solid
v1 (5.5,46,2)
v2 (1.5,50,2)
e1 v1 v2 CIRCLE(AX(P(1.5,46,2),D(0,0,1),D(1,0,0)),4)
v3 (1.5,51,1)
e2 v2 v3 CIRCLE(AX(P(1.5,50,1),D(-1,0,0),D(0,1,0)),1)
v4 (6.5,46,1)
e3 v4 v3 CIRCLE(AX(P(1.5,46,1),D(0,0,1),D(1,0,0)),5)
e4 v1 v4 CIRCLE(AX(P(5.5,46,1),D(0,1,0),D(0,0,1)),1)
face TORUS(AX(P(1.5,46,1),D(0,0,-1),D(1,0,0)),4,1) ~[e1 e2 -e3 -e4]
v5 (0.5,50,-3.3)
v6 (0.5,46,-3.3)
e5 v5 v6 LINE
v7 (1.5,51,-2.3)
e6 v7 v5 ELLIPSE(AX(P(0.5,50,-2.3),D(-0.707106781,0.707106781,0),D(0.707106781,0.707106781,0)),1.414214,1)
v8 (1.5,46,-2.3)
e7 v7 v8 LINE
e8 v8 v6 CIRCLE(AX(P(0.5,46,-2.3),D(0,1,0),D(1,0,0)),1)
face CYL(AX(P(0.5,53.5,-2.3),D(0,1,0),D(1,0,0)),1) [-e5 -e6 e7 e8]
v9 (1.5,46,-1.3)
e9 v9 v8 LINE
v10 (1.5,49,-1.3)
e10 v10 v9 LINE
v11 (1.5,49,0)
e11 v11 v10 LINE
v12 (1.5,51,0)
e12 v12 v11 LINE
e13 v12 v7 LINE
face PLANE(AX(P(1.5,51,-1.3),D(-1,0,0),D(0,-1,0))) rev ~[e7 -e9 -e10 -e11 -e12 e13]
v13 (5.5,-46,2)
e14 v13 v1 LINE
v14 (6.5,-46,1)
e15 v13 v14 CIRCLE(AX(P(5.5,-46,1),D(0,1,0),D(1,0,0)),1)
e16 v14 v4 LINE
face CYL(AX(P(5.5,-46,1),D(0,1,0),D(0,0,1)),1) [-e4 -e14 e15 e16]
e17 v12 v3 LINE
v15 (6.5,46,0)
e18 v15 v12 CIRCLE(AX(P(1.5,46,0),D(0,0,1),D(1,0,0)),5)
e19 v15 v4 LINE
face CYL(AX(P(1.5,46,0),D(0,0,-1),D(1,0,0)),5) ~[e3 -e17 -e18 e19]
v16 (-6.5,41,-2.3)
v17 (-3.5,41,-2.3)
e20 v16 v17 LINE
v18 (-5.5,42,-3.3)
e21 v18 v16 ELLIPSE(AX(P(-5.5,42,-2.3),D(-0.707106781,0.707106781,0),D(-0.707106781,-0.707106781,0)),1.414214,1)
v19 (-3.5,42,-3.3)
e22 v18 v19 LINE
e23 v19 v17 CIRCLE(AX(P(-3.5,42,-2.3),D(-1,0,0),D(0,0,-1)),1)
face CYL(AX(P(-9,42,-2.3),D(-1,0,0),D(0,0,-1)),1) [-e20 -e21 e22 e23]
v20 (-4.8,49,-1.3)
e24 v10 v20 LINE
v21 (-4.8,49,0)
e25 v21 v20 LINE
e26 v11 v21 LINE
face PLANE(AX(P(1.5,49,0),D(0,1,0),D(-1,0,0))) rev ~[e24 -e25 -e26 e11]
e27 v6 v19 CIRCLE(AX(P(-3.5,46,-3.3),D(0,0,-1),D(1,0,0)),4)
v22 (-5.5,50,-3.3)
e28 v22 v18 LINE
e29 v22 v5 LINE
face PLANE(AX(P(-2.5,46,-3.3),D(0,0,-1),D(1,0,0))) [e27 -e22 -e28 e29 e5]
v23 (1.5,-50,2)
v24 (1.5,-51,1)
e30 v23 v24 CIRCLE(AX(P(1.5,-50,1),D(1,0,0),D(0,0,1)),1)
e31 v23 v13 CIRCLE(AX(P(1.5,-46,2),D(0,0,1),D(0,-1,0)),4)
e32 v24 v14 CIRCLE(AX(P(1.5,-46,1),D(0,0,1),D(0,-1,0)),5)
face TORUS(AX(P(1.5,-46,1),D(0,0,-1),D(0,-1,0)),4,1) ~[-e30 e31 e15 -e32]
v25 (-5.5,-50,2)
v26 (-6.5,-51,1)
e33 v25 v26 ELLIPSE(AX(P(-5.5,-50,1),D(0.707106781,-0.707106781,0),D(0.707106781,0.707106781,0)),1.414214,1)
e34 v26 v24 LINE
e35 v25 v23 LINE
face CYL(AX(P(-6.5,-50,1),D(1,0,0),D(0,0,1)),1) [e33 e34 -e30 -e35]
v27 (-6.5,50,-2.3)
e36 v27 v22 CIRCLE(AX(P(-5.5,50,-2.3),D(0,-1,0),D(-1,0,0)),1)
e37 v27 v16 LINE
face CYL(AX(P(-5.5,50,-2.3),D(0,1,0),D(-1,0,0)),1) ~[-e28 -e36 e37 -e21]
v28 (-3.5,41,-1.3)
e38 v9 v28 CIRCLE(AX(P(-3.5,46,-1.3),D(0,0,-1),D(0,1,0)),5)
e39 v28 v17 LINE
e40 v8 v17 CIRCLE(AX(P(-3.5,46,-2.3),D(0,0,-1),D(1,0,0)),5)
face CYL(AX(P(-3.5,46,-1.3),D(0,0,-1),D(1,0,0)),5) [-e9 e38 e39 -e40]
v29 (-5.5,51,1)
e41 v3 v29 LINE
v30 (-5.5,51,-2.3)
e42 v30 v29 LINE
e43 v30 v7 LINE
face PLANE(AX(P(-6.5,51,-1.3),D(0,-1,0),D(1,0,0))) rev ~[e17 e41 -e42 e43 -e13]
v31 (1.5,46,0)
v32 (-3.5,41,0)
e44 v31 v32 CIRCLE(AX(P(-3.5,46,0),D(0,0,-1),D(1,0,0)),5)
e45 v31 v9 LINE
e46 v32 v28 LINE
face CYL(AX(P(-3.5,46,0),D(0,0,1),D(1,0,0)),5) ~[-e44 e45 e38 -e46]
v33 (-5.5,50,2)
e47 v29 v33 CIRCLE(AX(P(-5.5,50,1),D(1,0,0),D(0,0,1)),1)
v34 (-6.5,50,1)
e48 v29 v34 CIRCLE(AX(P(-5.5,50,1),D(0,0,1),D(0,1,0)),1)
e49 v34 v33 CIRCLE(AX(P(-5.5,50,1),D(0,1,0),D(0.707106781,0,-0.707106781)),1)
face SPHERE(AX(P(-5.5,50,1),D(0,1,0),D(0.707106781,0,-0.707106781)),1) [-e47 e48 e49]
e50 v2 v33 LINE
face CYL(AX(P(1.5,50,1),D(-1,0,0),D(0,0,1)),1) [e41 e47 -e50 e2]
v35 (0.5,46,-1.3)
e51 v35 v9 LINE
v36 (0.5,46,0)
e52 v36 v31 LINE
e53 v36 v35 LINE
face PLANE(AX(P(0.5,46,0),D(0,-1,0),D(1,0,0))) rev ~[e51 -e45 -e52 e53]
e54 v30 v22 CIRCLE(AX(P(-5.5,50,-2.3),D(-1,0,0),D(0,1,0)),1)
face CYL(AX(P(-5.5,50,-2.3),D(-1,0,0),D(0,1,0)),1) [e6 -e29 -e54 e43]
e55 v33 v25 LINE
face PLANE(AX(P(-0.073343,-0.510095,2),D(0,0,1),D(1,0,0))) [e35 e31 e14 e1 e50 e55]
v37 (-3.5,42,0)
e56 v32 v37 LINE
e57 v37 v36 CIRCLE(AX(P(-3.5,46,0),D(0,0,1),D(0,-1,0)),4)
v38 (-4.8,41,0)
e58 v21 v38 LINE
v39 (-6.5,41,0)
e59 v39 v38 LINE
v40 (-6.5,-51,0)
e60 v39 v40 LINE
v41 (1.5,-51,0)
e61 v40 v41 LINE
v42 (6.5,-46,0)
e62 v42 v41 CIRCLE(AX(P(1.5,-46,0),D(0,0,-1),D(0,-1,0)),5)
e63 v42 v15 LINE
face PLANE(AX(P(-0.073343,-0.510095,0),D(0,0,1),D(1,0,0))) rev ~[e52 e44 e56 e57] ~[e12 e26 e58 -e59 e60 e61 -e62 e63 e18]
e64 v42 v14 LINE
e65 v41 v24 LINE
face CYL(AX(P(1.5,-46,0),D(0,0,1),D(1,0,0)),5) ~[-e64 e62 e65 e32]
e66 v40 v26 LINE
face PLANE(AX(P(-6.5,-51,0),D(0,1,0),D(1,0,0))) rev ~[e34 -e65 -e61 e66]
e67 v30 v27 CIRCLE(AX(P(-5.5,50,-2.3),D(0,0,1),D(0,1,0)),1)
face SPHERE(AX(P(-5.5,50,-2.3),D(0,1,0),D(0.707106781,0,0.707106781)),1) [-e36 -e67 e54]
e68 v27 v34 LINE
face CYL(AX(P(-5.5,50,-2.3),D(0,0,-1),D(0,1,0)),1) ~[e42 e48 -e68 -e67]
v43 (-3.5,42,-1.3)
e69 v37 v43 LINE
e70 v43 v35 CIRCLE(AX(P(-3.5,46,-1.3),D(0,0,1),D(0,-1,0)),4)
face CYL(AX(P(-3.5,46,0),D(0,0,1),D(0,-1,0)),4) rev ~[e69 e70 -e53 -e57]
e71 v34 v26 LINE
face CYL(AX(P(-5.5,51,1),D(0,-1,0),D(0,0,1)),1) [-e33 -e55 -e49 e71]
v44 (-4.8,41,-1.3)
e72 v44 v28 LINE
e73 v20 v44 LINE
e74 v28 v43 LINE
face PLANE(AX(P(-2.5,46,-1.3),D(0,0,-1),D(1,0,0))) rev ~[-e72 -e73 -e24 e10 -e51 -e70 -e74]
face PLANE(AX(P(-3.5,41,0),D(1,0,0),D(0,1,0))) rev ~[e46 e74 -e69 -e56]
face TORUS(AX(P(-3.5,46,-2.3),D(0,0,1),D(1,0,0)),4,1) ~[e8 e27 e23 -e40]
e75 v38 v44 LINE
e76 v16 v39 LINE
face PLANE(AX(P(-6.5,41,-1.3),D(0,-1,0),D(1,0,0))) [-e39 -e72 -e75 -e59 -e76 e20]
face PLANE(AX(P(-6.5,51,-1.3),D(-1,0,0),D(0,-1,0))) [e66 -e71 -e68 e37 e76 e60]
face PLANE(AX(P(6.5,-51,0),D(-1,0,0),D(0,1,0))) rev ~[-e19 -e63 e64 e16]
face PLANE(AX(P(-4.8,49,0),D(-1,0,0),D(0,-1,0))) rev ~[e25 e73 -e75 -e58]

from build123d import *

# Parameters (mm, degrees)
F1_DEPTH     = 2
F2_W         = 1.7
F2_H         = 2
F2_W_2       = 6.3
F2_H_2       = 8
F3_DEPTH     = 1.3
F4_W         = 8
F4_H         = 10
F5_DEPTH     = 2
F6_R         = 5
F7_R         = 1
F8_T1_DEPTH  = 3.3
F8_T3_DEPTH  = 7.5
F8_T5_DEPTH  = 9.5
F8_T7_DEPTH  = 5.5
F8_T9_DEPTH  = 11.5
F8_S13_W     = 1
F8_S13_H     = 1
F8_T14_DEPTH = 1
F8_S19_W     = 1
F8_S19_H     = 1
F8_T20_DEPTH = 1
F8_T24_ANGLE = 90
F10_DEPTH    = 1.3


# Not quite as in the source:
# - a fillet or chamfer that OpenCascade refuses, or shapes differently, is made with other operations: its cross-section is extruded or revolved along the edge and cut away or added


with BuildPart() as f1:
    # F0 (on Top) → F1 (new body)
    with BuildSketch(Plane.XY):
        with BuildLine():
            Line((-6.5, -51), (6.5, -51))
            Line((6.5, -51), (6.5, 46))
            ThreePointArc((6.5, 46), (5.0355339059, 49.5355339059), (1.5, 51))
            Line((1.5, 51), (-6.5, 51))
            Line((-6.5, 51), (-6.5, -51))
        make_face()
    extrude(amount=F1_DEPTH)

    # F2 (on face) → F3 (join)
    with BuildSketch(Plane(origin=(0, 0, 0), x_dir=(1, 0, 0), z_dir=(0, 0, -1))):
        with Locations((-5.65, -50)):
            Rectangle(F2_W, F2_H)
        with Locations((-1.65, -50)):
            Rectangle(F2_W_2, F2_H)
        with Locations((-5.65, -45)):
            Rectangle(F2_W, F2_H_2)
    extrude(amount=F3_DEPTH)

    # F4 (on face) → F5 (join)
    with BuildSketch(Plane(origin=(0, 0, -1.3), x_dir=(1, 0, 0), z_dir=(0, 0, -1))):
        with Locations((-2.5, -46)):
            Rectangle(F4_W, F4_H)
    extrude(amount=F5_DEPTH)

    # F6
    f6_edges = [f1.edges().sort_by_distance(p)[0] for p in [
        (6.5, -51, 1),
        (1.5, 41, -2.3),
    ]]
    fillet(f6_edges, radius=F6_R)

    # F7
    f7_edges = [f1.edges().sort_by_distance(p)[0] for p in [
        (-2.5, -51, 2),
        (5.035534, -49.535534, 2),
        (-6.5, 0, 2),
        (6.5, 0, 2),
        (-2.5, 51, 2),
        (5.035534, 49.535534, 2),
    ]]
    fillet(f7_edges, radius=F7_R)

    # F8: fillet of radius 1 on 6 edges, made by hand

    # F8_s2 → F8_t1 (cut)
    with BuildSketch(Plane.XY.offset(-2.3)):
        with BuildLine():
            ThreePointArc((-5.5, 51), (-6.2071067812, 50.7071067812), (-6.5, 50))
            Line((-6.5, 50), (-6.5, 51))
            Line((-6.5, 51), (-5.5, 51))
        make_face()
    extrude(amount=F8_T1_DEPTH, mode=Mode.SUBTRACT)

    # F8_s4 → F8_t3 (cut)
    with BuildSketch(Plane.XZ.offset(-53.5)):
        with BuildLine():
            ThreePointArc((1.5, -2.3), (1.2071067812, -3.0071067812), (0.5, -3.3))
            Line((0.5, -3.3), (1.5, -3.3))
            Line((1.5, -3.3), (1.5, -2.3))
        make_face()
    extrude(amount=F8_T3_DEPTH, mode=Mode.SUBTRACT)

    # F8_s6 → F8_t5 (cut)
    with BuildSketch(Plane.YZ.offset(-5.5)):
        with BuildLine():
            ThreePointArc((51, -2.3), (50.7071067812, -3.0071067812), (50, -3.3))
            Line((50, -3.3), (51, -3.3))
            Line((51, -3.3), (51, -2.3))
        make_face()
    extrude(amount=F8_T5_DEPTH, mode=Mode.SUBTRACT)

    # F8_s8 → F8_t7 (cut)
    with BuildSketch(Plane.YZ.offset(-9)):
        with BuildLine():
            ThreePointArc((42, -3.3), (41.2928932188, -3.0071067812), (41, -2.3))
            Line((41, -2.3), (41, -3.3))
            Line((41, -3.3), (42, -3.3))
        make_face()
    extrude(amount=F8_T7_DEPTH, mode=Mode.SUBTRACT)

    # F8_s10 → F8_t9 (cut)
    with BuildSketch(Plane.XZ.offset(-50)):
        with BuildLine():
            ThreePointArc((-6.5, -2.3), (-6.2071067812, -3.0071067812), (-5.5, -3.3))
            Line((-5.5, -3.3), (-6.5, -3.3))
            Line((-6.5, -3.3), (-6.5, -2.3))
        make_face()
    extrude(amount=F8_T9_DEPTH, mode=Mode.SUBTRACT)


with BuildPart() as f8_tool12:
    # F8_s13 → F8_t14 (new body)
    with BuildSketch(Plane.XZ.offset(-50)):
        with Locations((-6, 1.5)):
            Rectangle(F8_S13_W, F8_S13_H)
    extrude(amount=-F8_T14_DEPTH)

    # F8_s15 → F8_t16 (revolve, cut)
    with BuildSketch(Plane(origin=(-5.5, 50, 1), x_dir=(0.7071067812, 0, -0.7071067812), z_dir=(0.7071067812, 0, 0.7071067812))):
        with BuildLine():
            ThreePointArc((0, -1), (1, 0), (0, 1))
            Line((0, 1), (0, -1))
        make_face()
    revolve(axis=Axis((-5.5, 50, 1), (0, 1, 0)), mode=Mode.SUBTRACT)


with BuildPart() as f1_1:
    add(f1.part)

    # F8_t11: cut F8_tool12
    add(f8_tool12.part, mode=Mode.SUBTRACT)


with BuildPart() as f8_tool18:
    # F8_s19 → F8_t20 (new body)
    with BuildSketch(Plane.XZ.offset(-50)):
        with Locations((-6, -2.8)):
            Rectangle(F8_S19_W, F8_S19_H)
    extrude(amount=-F8_T20_DEPTH)

    # F8_s21 → F8_t22 (revolve, cut)
    with BuildSketch(Plane(origin=(-5.5, 50, -2.3), x_dir=(0.7071067812, 0, 0.7071067812), z_dir=(-0.7071067812, 0, 0.7071067812))):
        with BuildLine():
            ThreePointArc((0, -1), (1, 0), (0, 1))
            Line((0, 1), (0, -1))
        make_face()
    revolve(axis=Axis((-5.5, 50, -2.3), (0, 1, 0)), mode=Mode.SUBTRACT)


with BuildPart() as f1_2:
    add(f1_1.part)

    # F8_t17: cut F8_tool18
    add(f8_tool18.part, mode=Mode.SUBTRACT)

    # F8_s23 → F8_t24 (revolve, cut)
    with BuildSketch(Plane.XZ.offset(-46)):
        with BuildLine():
            ThreePointArc((0.5, -3.3), (1.2071067812, -3.0071067812), (1.5, -2.3))
            Line((1.5, -2.3), (1.5, -3.3))
            Line((1.5, -3.3), (0.5, -3.3))
        make_face()
    revolve(axis=Axis((-3.5, 46, -3.3), (0, 0, -1)), revolution_arc=F8_T24_ANGLE, mode=Mode.SUBTRACT)

    # F9 (on face) → F10 (join, through all)
    with BuildSketch(Plane(origin=(0, 0, 0), x_dir=(1, 0, 0), z_dir=(0, 0, -1))):
        with BuildLine():
            ThreePointArc((-3.5, -42), (-0.6715728753, -43.1715728753), (0.5, -46))
            Line((0.5, -46), (1.5, -46))
            ThreePointArc((1.5, -46), (0.0355339059, -42.4644660941), (-3.5, -41))
            Line((-3.5, -41), (-3.5, -42))
        make_face()
    extrude(amount=F10_DEPTH)


solid = f1_2.part
